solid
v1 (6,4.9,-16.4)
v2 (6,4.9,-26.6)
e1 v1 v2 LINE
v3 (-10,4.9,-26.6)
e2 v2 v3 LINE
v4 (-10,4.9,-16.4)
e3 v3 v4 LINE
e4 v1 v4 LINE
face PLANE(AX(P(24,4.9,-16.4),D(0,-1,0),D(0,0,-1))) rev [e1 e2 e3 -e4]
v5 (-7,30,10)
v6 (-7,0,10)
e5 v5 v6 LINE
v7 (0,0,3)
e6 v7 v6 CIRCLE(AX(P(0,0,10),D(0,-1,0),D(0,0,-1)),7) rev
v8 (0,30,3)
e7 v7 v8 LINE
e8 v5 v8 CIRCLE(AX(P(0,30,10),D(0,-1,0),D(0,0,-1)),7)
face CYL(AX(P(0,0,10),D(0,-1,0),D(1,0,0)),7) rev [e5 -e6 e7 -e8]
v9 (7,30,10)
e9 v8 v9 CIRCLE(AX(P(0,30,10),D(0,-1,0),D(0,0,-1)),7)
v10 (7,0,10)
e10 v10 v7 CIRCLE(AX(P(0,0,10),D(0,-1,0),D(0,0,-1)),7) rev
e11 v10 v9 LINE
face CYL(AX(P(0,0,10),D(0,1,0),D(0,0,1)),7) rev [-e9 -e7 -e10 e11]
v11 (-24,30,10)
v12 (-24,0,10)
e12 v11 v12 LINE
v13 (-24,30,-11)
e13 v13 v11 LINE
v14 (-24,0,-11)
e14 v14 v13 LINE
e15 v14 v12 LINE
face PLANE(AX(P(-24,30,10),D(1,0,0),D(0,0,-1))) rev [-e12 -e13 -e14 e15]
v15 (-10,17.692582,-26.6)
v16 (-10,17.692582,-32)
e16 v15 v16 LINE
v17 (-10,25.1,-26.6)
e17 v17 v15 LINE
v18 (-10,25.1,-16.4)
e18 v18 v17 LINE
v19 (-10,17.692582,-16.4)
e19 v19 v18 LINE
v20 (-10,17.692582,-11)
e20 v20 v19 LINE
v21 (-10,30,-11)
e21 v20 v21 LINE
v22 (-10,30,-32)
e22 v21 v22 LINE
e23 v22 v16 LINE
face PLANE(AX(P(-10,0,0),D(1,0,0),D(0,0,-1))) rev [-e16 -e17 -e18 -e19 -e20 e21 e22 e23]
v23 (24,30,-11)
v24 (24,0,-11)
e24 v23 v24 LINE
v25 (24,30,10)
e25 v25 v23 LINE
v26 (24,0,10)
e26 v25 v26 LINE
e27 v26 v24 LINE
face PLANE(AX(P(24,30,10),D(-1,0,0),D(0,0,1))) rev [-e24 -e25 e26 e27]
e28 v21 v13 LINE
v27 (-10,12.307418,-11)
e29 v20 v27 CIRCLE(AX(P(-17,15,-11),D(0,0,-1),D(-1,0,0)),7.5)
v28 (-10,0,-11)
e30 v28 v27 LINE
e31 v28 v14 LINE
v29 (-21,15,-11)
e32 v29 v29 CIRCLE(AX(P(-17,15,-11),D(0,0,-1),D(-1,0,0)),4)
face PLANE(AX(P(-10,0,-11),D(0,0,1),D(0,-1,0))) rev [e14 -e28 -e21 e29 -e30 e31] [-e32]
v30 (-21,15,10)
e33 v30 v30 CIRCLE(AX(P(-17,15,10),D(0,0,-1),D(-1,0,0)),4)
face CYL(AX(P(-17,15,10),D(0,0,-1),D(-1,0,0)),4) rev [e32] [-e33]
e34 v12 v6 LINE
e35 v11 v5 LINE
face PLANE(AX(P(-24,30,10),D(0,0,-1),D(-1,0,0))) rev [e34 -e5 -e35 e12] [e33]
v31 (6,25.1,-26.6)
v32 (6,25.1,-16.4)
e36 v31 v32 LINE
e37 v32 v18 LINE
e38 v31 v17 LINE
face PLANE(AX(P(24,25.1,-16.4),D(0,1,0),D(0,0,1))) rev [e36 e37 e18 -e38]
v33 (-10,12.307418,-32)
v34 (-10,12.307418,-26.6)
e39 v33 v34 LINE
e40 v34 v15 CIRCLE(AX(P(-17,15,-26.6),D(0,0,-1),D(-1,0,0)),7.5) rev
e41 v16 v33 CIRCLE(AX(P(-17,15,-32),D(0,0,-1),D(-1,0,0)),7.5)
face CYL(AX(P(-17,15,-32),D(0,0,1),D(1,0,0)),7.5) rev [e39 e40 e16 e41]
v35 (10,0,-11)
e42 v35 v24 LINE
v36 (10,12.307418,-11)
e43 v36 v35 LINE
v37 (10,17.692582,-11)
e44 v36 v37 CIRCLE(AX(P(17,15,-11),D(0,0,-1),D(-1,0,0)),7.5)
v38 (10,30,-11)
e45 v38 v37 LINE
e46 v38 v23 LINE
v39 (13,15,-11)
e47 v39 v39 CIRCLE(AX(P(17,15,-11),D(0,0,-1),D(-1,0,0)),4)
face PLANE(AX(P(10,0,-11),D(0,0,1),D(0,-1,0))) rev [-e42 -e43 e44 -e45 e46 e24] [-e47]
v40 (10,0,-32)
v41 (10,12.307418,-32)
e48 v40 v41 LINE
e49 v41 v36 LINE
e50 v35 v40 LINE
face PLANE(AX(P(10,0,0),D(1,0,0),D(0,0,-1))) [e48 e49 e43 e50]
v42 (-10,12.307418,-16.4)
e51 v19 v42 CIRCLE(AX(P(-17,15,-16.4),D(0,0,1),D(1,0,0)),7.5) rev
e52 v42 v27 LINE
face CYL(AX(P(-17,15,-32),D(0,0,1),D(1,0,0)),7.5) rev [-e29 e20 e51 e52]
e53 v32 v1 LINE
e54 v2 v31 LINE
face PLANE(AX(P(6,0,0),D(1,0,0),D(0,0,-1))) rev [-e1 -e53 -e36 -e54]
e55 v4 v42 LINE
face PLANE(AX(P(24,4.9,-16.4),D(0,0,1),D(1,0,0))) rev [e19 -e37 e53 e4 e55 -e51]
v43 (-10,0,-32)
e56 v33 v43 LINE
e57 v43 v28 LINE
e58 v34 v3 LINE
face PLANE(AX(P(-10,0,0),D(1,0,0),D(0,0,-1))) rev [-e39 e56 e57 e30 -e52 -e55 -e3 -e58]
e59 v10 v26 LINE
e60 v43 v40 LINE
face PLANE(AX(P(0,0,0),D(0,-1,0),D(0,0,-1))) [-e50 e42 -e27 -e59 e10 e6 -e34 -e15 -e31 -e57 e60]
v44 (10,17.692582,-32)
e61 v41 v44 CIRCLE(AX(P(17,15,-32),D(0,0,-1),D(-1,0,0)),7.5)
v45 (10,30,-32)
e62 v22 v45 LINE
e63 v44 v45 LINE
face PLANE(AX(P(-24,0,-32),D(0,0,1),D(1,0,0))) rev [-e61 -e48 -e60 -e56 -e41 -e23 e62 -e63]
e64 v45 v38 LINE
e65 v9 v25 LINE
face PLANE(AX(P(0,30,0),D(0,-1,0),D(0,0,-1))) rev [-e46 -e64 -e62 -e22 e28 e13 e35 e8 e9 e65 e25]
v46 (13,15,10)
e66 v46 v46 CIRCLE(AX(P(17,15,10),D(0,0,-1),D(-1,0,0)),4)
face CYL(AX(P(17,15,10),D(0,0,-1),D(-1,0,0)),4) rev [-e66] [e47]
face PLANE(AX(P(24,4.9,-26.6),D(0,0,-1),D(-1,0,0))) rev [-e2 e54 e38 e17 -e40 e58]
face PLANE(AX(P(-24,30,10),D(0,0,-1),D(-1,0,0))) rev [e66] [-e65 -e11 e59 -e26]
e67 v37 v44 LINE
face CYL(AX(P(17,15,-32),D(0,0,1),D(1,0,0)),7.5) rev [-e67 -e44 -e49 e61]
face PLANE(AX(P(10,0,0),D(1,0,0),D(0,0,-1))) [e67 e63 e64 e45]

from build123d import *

# Parameters (mm, degrees)
SKETCH_1_W          = 48
SKETCH_1_H          = 20
EXTRUDE_1_DEPTH     = 30
SKETCH_2_W          = 14
SKETCH_2_H          = 30
CUT_EXTRUDE_1_DEPTH = 7
SKETCH_7_W          = 22
SKETCH_7_H          = 30
EXTRUDE_2_DEPTH     = 48
SKETCH_8_W          = 21
SKETCH_8_H          = 30
CUT_EXTRUDE_2_DEPTH = 14
SKETCH_9_W          = 21
SKETCH_9_H          = 30
CUT_EXTRUDE_3_DEPTH = 14
SKETCH_11_W         = 10.2
SKETCH_11_H         = 20.2
CUT_EXTRUDE_4_DEPTH = 56.497747702
SKETCH_13_R         = 4
CUT_EXTRUDE_5_DEPTH = 44.783558558
SKETCH_14_R         = 4
CUT_EXTRUDE_6_DEPTH = 44.783558558
FILLET_1_R          = 7
SKETCH1_W           = 10.2
SKETCH1_H           = 20.2
BOSS_EXTRUDE1_DEPTH = 4
SKETCH_20_R         = 7.5
CUT_EXTRUDE_8_DEPTH = 44.783558558


with BuildPart() as part:
    # Эскиз1 → Бобышка-Вытянуть1 (new body)
    with BuildSketch(Plane(origin=(0, 0, 0), x_dir=(1, 0, 0), z_dir=(0, 1, 0))):
        Rectangle(SKETCH_1_W, SKETCH_1_H)
    extrude(amount=EXTRUDE_1_DEPTH)

    # Эскиз2 → Вырез-Вытянуть1 (cut)
    with BuildSketch(Plane.XY.offset(10)):
        with Locations((0, 15)):
            Rectangle(SKETCH_2_W, SKETCH_2_H)
    extrude(amount=-CUT_EXTRUDE_1_DEPTH, mode=Mode.SUBTRACT)

    # Эскиз7 → Бобышка-Вытянуть2 (add)
    with BuildSketch(Plane(origin=(24, 0, 0), x_dir=(0, 0, -1), z_dir=(1, 0, 0))):
        with Locations((21, 15)):
            Rectangle(SKETCH_7_W, SKETCH_7_H)
    extrude(amount=-EXTRUDE_2_DEPTH)

    # Эскиз8 → Вырез-Вытянуть2 (cut)
    with BuildSketch(Plane(origin=(24, 0, 0), x_dir=(0, 0, -1), z_dir=(1, 0, 0))):
        with Locations((21.5, 15)):
            Rectangle(SKETCH_8_W, SKETCH_8_H)
    extrude(amount=-CUT_EXTRUDE_2_DEPTH, mode=Mode.SUBTRACT)

    # Эскиз9 → Вырез-Вытянуть3 (cut)
    with BuildSketch(Plane.ZY.offset(24)):
        with Locations((-21.5, 15)):
            Rectangle(SKETCH_9_W, SKETCH_9_H)
    extrude(amount=-CUT_EXTRUDE_3_DEPTH, mode=Mode.SUBTRACT)

    # Эскиз11 → Вырез-Вытянуть4 (cut, through all)
    with BuildSketch(Plane.ZY.offset(10)):
        with Locations((-21.5, 15)):
            Rectangle(SKETCH_11_W, SKETCH_11_H)
    extrude(amount=-CUT_EXTRUDE_4_DEPTH, mode=Mode.SUBTRACT)

    # Эскиз13 → Вырез-Вытянуть5 (cut, through all)
    with BuildSketch(Plane(origin=(0, 0, -11), x_dir=(-1, 0, 0), z_dir=(0, 0, -1))):
        with Locations((17, 15)):
            Circle(SKETCH_13_R)
    extrude(amount=-CUT_EXTRUDE_5_DEPTH, mode=Mode.SUBTRACT)

    # Эскиз14 → Вырез-Вытянуть6 (cut, through all)
    with BuildSketch(Plane(origin=(0, 0, -11), x_dir=(-1, 0, 0), z_dir=(0, 0, -1))):
        with Locations((-17, 15)):
            Circle(SKETCH_14_R)
    extrude(amount=-CUT_EXTRUDE_6_DEPTH, mode=Mode.SUBTRACT)

    # Скругление1
    fillet_1_edges = [part.edges().sort_by_distance(p)[0] for p in [
        (-7, 15, 3),
        (7, 15, 3),
    ]]
    fillet(fillet_1_edges, radius=FILLET_1_R - 0.0001)  # a hair under: the kernel refuses the full size

    # Sketch1 → Boss-Extrude1 (add)
    with BuildSketch(Plane(origin=(10, 0, 0), x_dir=(0, 0, -1), z_dir=(1, 0, 0))):
        with Locations((21.5, 15)):
            Rectangle(SKETCH1_W, SKETCH1_H)
    extrude(amount=-BOSS_EXTRUDE1_DEPTH)

    # Эскиз20 → Вырез-Вытянуть8 (cut, through all)
    with BuildSketch(Plane(origin=(0, 0, -11), x_dir=(-1, 0, 0), z_dir=(0, 0, -1))):
        with Locations((-17, 15)):
            Circle(SKETCH_20_R)
        with Locations((17, 15)):
            Circle(SKETCH_20_R)
    extrude(amount=CUT_EXTRUDE_8_DEPTH, mode=Mode.SUBTRACT)


solid = part.part
